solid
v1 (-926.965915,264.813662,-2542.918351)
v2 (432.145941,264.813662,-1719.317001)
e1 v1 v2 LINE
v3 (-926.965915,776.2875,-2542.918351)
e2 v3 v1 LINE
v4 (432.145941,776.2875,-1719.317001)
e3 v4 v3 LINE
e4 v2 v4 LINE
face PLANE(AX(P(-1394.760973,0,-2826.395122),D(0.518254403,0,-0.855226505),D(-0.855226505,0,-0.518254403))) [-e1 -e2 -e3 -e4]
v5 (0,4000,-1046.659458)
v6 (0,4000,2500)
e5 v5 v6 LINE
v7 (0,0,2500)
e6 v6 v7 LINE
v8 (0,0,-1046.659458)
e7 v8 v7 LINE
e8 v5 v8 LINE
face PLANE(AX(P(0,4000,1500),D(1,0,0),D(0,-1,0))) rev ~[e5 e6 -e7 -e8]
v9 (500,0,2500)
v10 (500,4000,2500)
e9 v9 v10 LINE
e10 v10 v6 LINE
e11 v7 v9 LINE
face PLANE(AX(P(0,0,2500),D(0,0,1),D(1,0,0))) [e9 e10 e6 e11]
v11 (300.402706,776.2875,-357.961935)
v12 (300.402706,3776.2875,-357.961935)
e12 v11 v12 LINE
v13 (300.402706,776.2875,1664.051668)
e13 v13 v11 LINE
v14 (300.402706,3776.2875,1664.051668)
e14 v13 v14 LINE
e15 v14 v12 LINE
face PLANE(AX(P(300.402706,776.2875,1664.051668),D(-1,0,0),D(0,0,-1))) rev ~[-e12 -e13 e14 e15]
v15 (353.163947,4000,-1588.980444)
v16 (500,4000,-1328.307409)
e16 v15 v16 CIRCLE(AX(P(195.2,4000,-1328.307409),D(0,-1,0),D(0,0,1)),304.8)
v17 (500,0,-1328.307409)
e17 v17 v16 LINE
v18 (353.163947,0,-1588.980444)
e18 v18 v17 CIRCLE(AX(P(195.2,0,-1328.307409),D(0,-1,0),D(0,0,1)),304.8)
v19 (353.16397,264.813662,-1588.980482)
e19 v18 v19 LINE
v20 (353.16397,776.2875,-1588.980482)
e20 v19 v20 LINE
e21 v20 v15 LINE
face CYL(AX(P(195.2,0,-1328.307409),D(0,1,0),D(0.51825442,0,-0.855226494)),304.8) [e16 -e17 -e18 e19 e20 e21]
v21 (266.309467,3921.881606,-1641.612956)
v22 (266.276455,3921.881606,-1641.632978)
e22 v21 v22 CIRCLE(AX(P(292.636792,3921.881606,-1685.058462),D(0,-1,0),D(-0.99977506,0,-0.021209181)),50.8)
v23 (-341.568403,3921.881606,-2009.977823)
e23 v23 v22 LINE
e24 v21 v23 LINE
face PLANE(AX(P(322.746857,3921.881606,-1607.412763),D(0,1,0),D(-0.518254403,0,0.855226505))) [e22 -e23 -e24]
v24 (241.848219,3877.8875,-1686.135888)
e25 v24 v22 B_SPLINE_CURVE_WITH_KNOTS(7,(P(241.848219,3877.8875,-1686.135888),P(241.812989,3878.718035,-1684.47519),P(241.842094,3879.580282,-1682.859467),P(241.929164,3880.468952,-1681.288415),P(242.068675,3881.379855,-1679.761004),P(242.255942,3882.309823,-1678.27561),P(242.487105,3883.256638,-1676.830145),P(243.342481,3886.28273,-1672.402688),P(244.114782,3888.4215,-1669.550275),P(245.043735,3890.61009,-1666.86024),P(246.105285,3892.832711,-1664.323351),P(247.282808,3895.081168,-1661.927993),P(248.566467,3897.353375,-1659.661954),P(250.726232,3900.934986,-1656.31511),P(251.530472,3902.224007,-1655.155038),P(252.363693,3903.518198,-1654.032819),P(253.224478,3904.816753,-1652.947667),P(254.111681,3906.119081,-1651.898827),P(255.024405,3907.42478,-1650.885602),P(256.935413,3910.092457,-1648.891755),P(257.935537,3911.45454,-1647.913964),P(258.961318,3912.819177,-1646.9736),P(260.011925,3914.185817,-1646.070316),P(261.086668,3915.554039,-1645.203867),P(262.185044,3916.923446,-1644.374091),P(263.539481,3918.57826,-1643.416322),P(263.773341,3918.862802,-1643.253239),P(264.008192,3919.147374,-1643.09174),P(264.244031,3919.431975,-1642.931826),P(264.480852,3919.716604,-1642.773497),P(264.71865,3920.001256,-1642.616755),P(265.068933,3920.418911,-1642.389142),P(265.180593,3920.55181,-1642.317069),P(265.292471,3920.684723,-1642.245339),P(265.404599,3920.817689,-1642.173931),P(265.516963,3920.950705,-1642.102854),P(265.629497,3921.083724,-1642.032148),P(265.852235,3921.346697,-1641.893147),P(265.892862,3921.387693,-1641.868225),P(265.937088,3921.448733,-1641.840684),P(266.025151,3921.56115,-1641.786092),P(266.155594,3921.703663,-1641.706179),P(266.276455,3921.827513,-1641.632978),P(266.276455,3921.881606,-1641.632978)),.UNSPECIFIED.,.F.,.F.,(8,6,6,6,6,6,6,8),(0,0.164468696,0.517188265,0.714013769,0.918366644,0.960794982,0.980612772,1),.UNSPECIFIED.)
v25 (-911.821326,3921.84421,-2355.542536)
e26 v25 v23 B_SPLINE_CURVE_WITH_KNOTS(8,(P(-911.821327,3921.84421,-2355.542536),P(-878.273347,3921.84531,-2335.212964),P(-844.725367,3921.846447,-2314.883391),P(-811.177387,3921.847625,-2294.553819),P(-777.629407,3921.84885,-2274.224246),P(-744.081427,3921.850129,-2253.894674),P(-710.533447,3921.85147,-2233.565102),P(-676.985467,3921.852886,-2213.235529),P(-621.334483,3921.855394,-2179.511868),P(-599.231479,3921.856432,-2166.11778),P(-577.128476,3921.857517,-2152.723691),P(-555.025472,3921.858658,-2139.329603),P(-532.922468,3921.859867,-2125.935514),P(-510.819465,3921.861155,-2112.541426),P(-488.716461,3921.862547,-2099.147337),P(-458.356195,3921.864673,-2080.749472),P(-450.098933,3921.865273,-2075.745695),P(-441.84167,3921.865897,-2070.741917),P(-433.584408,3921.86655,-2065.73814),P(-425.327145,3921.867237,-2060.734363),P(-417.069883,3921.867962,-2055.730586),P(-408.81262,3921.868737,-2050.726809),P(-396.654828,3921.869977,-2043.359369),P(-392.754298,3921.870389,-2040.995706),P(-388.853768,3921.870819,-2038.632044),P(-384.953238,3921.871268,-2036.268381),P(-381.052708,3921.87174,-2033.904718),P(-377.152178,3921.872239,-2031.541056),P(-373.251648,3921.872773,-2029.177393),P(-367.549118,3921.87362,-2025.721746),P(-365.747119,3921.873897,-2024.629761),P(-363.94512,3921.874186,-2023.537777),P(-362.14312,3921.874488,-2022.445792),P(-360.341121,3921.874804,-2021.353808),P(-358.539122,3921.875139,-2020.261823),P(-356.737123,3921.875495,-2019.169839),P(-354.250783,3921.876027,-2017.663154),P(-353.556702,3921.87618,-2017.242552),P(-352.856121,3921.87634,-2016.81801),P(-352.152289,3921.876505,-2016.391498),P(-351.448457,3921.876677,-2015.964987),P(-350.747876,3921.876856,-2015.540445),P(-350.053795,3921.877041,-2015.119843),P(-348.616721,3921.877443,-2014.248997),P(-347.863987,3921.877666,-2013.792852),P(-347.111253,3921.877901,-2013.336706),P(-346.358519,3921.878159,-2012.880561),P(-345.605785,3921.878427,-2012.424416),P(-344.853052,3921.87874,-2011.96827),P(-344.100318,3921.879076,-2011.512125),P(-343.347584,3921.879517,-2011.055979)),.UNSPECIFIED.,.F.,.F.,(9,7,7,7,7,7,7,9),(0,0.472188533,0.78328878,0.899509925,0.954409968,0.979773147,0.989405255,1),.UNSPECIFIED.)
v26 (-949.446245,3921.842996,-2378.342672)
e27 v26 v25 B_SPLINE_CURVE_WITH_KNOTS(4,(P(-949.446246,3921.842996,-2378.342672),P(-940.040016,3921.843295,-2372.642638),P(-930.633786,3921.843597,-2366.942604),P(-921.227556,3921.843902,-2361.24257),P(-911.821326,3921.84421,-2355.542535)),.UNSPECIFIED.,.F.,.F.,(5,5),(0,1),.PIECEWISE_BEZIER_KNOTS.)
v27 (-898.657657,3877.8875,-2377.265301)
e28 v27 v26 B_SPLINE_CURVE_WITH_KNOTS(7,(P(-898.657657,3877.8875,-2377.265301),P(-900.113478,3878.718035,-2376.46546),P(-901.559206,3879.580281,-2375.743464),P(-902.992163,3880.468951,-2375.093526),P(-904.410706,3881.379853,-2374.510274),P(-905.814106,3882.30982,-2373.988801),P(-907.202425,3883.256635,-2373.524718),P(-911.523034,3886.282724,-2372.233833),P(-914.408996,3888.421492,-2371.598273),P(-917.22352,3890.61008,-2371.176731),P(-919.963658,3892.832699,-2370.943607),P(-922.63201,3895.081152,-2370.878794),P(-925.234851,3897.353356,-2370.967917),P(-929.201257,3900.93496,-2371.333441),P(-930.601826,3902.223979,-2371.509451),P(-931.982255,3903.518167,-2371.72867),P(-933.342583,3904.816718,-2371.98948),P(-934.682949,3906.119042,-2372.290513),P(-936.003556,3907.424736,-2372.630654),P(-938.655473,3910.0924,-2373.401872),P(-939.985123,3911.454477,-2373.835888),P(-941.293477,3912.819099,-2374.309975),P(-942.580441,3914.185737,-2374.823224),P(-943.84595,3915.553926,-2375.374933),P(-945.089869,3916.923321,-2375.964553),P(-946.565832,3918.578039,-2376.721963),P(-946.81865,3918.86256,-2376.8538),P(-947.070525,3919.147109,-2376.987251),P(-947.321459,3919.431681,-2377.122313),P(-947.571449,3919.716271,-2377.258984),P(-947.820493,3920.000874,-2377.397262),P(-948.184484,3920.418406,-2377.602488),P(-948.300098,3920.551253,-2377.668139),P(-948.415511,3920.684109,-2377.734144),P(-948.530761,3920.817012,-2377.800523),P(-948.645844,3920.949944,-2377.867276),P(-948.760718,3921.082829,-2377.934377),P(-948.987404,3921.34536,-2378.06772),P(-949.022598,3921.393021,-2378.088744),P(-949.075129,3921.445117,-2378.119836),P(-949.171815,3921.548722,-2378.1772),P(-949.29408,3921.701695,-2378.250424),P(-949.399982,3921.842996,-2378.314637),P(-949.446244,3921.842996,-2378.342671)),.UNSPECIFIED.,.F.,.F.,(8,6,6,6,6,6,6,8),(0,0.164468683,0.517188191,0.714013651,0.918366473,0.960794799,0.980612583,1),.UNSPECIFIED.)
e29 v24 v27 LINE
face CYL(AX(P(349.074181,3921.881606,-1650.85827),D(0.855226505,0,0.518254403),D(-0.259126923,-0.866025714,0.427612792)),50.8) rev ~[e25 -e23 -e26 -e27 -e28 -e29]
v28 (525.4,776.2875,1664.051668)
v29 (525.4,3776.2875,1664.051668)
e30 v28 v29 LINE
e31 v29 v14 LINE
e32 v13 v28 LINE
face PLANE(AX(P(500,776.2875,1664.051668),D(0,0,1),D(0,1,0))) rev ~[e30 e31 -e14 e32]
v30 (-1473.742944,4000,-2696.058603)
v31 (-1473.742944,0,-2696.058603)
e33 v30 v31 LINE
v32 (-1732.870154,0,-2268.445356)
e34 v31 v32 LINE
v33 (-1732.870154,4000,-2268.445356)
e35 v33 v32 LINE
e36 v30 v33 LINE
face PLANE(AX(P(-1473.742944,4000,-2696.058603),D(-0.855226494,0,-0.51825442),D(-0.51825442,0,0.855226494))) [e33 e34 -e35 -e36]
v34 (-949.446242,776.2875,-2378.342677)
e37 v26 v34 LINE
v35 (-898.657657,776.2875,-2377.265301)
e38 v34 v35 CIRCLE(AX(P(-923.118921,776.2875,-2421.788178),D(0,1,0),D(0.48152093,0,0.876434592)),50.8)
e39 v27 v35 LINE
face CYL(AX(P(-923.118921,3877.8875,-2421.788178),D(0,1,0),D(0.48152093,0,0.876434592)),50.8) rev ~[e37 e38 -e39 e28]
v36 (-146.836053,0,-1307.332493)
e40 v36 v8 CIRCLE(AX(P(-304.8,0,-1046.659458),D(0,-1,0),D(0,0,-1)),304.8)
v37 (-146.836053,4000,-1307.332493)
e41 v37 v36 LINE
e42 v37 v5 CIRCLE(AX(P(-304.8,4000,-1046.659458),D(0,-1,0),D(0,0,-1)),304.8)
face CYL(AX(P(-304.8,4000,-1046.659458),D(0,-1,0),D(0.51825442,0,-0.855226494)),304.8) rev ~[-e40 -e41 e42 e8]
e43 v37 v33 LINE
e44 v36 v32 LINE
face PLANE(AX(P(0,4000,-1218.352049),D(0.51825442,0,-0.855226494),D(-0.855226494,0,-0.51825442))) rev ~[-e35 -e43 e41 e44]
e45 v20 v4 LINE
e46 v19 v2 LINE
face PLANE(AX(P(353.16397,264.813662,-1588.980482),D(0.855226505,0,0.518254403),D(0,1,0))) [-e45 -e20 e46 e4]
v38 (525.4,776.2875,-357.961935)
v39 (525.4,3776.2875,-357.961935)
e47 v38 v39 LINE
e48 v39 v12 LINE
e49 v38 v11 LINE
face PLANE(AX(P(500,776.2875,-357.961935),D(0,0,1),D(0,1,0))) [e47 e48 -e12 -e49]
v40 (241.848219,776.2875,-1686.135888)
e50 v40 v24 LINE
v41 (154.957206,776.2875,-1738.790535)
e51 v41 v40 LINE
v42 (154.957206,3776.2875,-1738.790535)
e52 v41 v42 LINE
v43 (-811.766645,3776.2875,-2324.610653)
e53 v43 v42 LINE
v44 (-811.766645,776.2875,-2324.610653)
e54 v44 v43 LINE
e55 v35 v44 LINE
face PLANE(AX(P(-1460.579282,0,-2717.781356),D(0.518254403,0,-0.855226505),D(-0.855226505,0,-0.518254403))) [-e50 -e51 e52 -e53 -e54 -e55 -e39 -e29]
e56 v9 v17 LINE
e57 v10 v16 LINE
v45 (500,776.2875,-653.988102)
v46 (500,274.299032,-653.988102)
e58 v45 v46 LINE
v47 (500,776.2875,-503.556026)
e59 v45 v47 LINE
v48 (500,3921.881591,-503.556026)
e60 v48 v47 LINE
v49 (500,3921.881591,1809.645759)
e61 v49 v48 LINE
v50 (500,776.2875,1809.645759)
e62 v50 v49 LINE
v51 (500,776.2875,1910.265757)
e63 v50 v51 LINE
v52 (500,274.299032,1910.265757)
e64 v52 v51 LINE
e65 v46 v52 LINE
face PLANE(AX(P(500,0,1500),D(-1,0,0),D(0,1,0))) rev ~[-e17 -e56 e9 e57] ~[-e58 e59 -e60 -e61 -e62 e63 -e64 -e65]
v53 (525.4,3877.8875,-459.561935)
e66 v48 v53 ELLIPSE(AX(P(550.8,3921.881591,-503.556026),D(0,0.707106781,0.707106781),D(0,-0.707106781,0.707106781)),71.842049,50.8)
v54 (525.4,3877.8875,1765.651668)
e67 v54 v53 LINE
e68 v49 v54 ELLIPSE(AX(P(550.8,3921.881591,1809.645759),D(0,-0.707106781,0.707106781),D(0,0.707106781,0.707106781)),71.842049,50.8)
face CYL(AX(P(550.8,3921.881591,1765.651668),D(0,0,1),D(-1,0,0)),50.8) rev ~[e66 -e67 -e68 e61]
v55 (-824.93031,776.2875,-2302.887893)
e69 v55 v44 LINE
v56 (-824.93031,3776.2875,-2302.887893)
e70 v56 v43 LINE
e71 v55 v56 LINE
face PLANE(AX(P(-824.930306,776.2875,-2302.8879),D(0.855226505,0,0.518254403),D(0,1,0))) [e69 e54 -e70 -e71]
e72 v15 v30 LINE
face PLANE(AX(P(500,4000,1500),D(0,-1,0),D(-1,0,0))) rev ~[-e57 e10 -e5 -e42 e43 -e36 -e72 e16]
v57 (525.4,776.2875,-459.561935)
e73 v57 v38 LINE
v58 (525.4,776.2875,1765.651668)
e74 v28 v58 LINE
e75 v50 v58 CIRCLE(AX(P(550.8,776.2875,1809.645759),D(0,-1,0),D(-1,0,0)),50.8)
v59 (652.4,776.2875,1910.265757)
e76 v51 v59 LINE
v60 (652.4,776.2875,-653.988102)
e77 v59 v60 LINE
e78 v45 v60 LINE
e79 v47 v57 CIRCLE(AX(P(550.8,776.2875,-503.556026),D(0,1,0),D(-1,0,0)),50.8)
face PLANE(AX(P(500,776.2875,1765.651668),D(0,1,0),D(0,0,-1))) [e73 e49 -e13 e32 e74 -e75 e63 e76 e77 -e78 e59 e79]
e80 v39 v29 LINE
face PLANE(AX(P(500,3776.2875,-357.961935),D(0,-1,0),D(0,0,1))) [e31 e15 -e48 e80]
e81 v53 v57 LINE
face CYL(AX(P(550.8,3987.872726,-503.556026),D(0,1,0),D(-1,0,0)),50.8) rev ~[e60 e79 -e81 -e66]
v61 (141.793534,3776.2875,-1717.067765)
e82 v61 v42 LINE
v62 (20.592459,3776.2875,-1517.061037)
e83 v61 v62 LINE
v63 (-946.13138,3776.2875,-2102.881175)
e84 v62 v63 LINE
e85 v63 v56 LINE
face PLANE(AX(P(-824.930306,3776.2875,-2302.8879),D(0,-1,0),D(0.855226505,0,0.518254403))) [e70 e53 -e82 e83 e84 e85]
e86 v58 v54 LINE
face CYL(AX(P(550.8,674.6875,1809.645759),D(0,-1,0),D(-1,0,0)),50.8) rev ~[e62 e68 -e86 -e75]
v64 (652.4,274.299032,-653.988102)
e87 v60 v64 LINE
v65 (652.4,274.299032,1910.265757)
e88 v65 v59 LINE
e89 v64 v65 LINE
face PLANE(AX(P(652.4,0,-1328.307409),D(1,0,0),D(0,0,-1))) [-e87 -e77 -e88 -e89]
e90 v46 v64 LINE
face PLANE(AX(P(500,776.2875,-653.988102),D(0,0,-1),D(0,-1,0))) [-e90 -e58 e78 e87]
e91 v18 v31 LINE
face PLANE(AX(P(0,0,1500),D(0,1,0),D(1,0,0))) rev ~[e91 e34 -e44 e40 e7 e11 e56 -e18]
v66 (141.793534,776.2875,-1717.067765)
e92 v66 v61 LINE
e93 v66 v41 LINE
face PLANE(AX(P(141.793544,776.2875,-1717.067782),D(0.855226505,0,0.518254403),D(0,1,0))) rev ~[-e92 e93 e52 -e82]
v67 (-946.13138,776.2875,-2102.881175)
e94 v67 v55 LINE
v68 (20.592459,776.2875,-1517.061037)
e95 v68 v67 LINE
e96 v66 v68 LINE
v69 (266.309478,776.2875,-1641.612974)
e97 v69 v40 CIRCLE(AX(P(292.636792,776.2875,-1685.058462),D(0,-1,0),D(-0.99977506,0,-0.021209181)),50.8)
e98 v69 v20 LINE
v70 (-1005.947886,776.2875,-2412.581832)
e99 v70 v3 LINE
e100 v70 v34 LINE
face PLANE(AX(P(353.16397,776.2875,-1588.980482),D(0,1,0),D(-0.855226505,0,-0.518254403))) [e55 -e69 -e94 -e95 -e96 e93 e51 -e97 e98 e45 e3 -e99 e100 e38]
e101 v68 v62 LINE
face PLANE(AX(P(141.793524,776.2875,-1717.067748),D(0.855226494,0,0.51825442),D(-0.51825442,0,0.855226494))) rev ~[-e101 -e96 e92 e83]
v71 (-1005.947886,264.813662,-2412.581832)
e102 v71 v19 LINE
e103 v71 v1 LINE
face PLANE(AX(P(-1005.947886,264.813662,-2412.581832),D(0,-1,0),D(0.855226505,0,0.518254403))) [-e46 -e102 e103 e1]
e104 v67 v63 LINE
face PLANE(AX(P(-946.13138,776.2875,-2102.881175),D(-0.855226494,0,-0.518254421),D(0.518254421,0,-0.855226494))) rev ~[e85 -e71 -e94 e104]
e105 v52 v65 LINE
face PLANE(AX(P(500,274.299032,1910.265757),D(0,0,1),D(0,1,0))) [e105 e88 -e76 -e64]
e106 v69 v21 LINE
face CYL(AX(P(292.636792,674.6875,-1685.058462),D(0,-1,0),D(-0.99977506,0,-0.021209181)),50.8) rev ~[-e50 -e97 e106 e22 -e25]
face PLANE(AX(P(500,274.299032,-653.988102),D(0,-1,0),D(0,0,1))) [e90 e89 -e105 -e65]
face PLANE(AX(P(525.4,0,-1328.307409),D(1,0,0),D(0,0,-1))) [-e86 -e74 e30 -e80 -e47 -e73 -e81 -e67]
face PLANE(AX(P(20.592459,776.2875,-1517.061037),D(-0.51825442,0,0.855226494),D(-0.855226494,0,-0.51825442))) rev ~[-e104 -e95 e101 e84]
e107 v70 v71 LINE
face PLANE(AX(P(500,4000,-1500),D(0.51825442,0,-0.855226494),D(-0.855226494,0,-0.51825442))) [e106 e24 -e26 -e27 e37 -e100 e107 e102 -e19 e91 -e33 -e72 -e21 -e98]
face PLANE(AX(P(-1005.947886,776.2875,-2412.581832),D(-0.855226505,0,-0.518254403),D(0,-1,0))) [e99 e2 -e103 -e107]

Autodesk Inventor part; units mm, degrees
ref_plane "YZ Plane" through (0, 0, 0) normal (1, 0, 0) x (0, 1, 0)
ref_plane "XZ Plane" through (0, 0, 0) normal (0, 1, 0) x (-1, 0, 0)
sketch "Sketch1" plane through (0, 0, 0) normal (0, 0, 1) x (1, 0, 0)
  line L0 (0, 0) -> (500, 0)
  line L1 (500, 0) -> (500, 4000)
  line L2 (500, 4000) -> (0, 4000)
  line L3 (0, 4000) -> (0, 0)
  point P0 (250, 0)
  dimension "d0" = 500
  dimension "d1" = 4000
extrude "Extrusion1" add sketch "Sketch1" along normal mid plane 3000
sketch "Sketch2" plane through (0, 4000, 1500) normal (0, 1, 0) x (1, 0, 0)
  line L0 (0, 3000) -> (0, 0)
  line L1 (500, 0) -> (0, 0)
  line L2 (500, 3000) -> (500, 0)
  line L3 (0, 3000) -> (500, 3000)
  line L4 (500, 3000) -> (-1473.742944, 4196.058603)
  line L5 (0, 2718.352049) -> (-1732.870154, 3768.445356)
  line L6 (-1473.742944, 4196.058603) -> (-1732.870154, 3768.445356)
  point P0 (0, 1500)
  dimension "d18" = 500
extrude "Extrusion4" add sketch "Sketch2" against normal up to surface (4000 mm away) contours L0 L5 L6 L4 L3
fillet "Fillet2" radius 304.8 2 edges at (500, 2000, -1500) (0, 2000, -1218.352)
fillet "Fillet3" [suppressed]
fillet "Fillet4" [suppressed]
sketch "Sketch4" plane through (0, 0, 1500) normal (0, 0, 1) x (1, 0, 0)
  line L0 (0, 4000) -> (0, 0) projected
  line L1 (0, 0) -> (500, 0) projected
  line L2 (500, 0) -> (500, 4000) projected
  line L3 (500, 4000) -> (0, 4000) projected
extrude "Extrusion5" add sketch "Sketch4" along normal blind 1000
ref_plane "Work Plane3" through (0, 776.2875, 2500) normal (0, -1, 0) x (1, 0, 0)
sketch "Sketch5" plane through (0, 776.2875, 2500) normal (0, 1, 0) x (1, 0, 0)
  arc A0 (500, 3828.307409) -> (353.163947, 4088.980444) centre (195.2, 3828.307409) ccw
  line L0 (500, 0) -> (500, 3828.307409)
  line L1 (0, 0) -> (500, 0)
  line L2 (0, 3546.659458) -> (0, 0)
  arc A1 (0, 3546.659458) -> (-146.836053, 3807.332493) centre (-304.8, 3546.659458) ccw
  line L3 (-1732.870154, 4768.445356) -> (-146.836053, 3807.332493)
  line L4 (-1473.742944, 5196.058603) -> (-1732.870154, 4768.445356)
  line L5 (353.163947, 4088.980444) -> (-1473.742944, 5196.058603)
  line L6 (500, 835.948332) -> (300.402706, 835.948332)
  line L7 (300.402706, 835.948332) -> (300.402706, 2857.961935)
  line L8 (300.402706, 2857.961935) -> (500, 2857.961935)
  line L9 (141.793524, 4217.067748) -> (20.592459, 4017.061037)
  line L10 (20.592459, 4017.061037) -> (-946.13138, 4602.881175)
  line L11 (-946.13138, 4602.881175) -> (-824.930314, 4802.887887)
  point P0 (0, 2500)
extrude "Extrusion6" cut sketch "Sketch5" along normal blind 3000 contours L0 L6 L7 L8 | L9 L10 L11 L5
sketch "Sketch6" plane through (500, 0, -1328.307409) normal (1, 0, 0) x (0, 0, -1)
  line L0 (-970.345474, 776.2875) -> (-2992.359077, 776.2875)
  line L1 (-970.345474, 776.2875) -> (-970.345474, 3776.2875)
  line L2 (-970.345474, 3776.2875) -> (-2992.359077, 3776.2875)
  line L3 (-2992.359077, 776.2875) -> (-2992.359077, 3776.2875)
  line L4 (-3093.959077, 3877.8875) -> (-868.745474, 3877.8875)
  line L5 (-868.745474, 3877.8875) -> (-868.745474, 674.6875)
  line L6 (-868.745474, 674.6875) -> (-3093.959077, 674.6875)
  line L7 (-3093.959077, 674.6875) -> (-3093.959077, 3877.8875)
  point P0 (-1328.307409, 0)
  dimension "d29" = 101.6
extrude "Extrusion7" add sketch "Sketch6" along normal blind 25.4
sketch "Sketch7" plane through (-1473.742944, 0, -2696.058603) normal (0.5182544, 0, -0.8552265) x (-0.8552265, 0, -0.5182544)
  line L0 (-758.644212, 776.2875) -> (-1889.015927, 776.2875)
  line L1 (-758.644212, 776.2875) -> (-758.644212, 3776.2875)
  line L2 (-758.644212, 3776.2875) -> (-1889.015927, 3776.2875)
  line L3 (-1889.015927, 776.2875) -> (-1889.015927, 3776.2875)
  line L4 (-1990.615927, 3877.8875) -> (-657.044212, 3877.8875)
  line L5 (-657.044212, 3877.8875) -> (-657.044212, 674.6875)
  line L6 (-657.044212, 674.6875) -> (-1990.615927, 674.6875)
  line L7 (-1990.615927, 674.6875) -> (-1990.615927, 3877.8875)
  point P0 (-2657.628299, 0)
  dimension "d32" = 101.6
extrude "Extrusion8" add sketch "Sketch7" along normal blind 25.4
fillet "Fillet5" radius 50.8 8 edges at (500, 674.6875, 653.0449) (500, 2276.2875, -459.5619) (500, 3877.8875, 653.0449) (500, 2276.2875, 1765.6517) (-911.8213, 2276.2875, -2355.5425) (-341.5684, 674.6875, -2009.9778) (228.6845, 2276.2875, -1664.4131) (-341.5684, 3877.8875, -2009.9778)
sketch "Sketch8" plane through (500, 0, -1328.307409) normal (1, 0, 0) x (0, 0, -1)
  line L0 (-3093.959077, 674.6875) -> (-868.745474, 674.6875)
  line L1 (-868.745474, 674.6875) -> (-868.745474, 3877.8875)
  line L2 (-868.745474, 3877.8875) -> (-3093.959077, 3877.8875)
  line L3 (-3093.959077, 3877.8875) -> (-3093.959077, 674.6875)
  line L4 (-970.345474, 3776.2875) -> (-970.345474, 776.2875)
  line L5 (-970.345474, 776.2875) -> (-2992.359077, 776.2875)
  line L6 (-2992.359077, 776.2875) -> (-2992.359077, 3776.2875)
  line L7 (-2992.359077, 3776.2875) -> (-970.345474, 3776.2875)
  line L8 (-3238.573166, 776.2875) -> (-674.319307, 776.2875)
  line L9 (-674.319307, 776.2875) -> (-674.319307, 274.299032)
  line L10 (-674.319307, 274.299032) -> (-3238.573166, 274.299032)
  line L11 (-3238.573166, 274.299032) -> (-3238.573166, 776.2875)
  point P0 (-1328.307409, 0)
  point P1 (-3093.959077, 776.2875)
  point P2 (-868.745474, 776.2875)
  point P3 (-970.345474, 776.2875)
  point P4 (-2992.359077, 776.2875)
extrude "Extrusion9" add sketch "Sketch8" along normal blind 152.4 contours L3 L8 L5 L1 L0 | L0 L1 L8 L9 L10 L11 L3
sketch "Sketch9" plane through (-1473.742944, 0, -2696.058603) normal (0.5182544, 0, -0.8552265) x (-0.8552265, 0, -0.5182544)
  line L0 (-2136.167325, 0) -> (-2136.167325, 4000)
  line L1 (-2136.167325, 0) -> (0, 0)
  line L2 (0, 4000) -> (0, 0)
  line L3 (-2136.167325, 4000) -> (0, 4000)
  line L4 (-2034.610018, 3921.881591) -> (-2034.610018, 630.693409)
  line L5 (-613.050122, 3921.881591) -> (-2034.610018, 3921.881591)
  line L6 (-613.050122, 630.693409) -> (-613.050122, 3921.881591)
  line L7 (-2034.610018, 630.693409) -> (-613.050122, 630.693409)
  line L8 (-2876.645839, 776.2875) -> (-4205.581737, 776.2875)
  line L9 (-4205.581737, 776.2875) -> (-4205.581737, 274.299032)
  line L10 (-4205.581737, 274.299032) -> (-2876.645839, 274.299032)
  line L11 (-2876.645839, 274.299032) -> (-2876.645839, 776.2875)
  line L12 (-2136.167325, 776.2875) -> (-546.983817, 776.2875)
  line L13 (-546.983817, 776.2875) -> (-546.983817, 264.813662)
  line L14 (-546.983817, 264.813662) -> (-2136.167325, 264.813662)
  line L15 (-2136.167325, 264.813662) -> (-2136.167325, 776.2875)
  point P0 (-2657.628299, 0)
  point P1 (-2136.167325, 264.813662)
extrude "Extrusion10" add sketch "Sketch9" along normal blind 152.4 contours L0 L12 L4 L7 L6 L13 L14 | L12 L6 L7 L4
properties part number "wall"
